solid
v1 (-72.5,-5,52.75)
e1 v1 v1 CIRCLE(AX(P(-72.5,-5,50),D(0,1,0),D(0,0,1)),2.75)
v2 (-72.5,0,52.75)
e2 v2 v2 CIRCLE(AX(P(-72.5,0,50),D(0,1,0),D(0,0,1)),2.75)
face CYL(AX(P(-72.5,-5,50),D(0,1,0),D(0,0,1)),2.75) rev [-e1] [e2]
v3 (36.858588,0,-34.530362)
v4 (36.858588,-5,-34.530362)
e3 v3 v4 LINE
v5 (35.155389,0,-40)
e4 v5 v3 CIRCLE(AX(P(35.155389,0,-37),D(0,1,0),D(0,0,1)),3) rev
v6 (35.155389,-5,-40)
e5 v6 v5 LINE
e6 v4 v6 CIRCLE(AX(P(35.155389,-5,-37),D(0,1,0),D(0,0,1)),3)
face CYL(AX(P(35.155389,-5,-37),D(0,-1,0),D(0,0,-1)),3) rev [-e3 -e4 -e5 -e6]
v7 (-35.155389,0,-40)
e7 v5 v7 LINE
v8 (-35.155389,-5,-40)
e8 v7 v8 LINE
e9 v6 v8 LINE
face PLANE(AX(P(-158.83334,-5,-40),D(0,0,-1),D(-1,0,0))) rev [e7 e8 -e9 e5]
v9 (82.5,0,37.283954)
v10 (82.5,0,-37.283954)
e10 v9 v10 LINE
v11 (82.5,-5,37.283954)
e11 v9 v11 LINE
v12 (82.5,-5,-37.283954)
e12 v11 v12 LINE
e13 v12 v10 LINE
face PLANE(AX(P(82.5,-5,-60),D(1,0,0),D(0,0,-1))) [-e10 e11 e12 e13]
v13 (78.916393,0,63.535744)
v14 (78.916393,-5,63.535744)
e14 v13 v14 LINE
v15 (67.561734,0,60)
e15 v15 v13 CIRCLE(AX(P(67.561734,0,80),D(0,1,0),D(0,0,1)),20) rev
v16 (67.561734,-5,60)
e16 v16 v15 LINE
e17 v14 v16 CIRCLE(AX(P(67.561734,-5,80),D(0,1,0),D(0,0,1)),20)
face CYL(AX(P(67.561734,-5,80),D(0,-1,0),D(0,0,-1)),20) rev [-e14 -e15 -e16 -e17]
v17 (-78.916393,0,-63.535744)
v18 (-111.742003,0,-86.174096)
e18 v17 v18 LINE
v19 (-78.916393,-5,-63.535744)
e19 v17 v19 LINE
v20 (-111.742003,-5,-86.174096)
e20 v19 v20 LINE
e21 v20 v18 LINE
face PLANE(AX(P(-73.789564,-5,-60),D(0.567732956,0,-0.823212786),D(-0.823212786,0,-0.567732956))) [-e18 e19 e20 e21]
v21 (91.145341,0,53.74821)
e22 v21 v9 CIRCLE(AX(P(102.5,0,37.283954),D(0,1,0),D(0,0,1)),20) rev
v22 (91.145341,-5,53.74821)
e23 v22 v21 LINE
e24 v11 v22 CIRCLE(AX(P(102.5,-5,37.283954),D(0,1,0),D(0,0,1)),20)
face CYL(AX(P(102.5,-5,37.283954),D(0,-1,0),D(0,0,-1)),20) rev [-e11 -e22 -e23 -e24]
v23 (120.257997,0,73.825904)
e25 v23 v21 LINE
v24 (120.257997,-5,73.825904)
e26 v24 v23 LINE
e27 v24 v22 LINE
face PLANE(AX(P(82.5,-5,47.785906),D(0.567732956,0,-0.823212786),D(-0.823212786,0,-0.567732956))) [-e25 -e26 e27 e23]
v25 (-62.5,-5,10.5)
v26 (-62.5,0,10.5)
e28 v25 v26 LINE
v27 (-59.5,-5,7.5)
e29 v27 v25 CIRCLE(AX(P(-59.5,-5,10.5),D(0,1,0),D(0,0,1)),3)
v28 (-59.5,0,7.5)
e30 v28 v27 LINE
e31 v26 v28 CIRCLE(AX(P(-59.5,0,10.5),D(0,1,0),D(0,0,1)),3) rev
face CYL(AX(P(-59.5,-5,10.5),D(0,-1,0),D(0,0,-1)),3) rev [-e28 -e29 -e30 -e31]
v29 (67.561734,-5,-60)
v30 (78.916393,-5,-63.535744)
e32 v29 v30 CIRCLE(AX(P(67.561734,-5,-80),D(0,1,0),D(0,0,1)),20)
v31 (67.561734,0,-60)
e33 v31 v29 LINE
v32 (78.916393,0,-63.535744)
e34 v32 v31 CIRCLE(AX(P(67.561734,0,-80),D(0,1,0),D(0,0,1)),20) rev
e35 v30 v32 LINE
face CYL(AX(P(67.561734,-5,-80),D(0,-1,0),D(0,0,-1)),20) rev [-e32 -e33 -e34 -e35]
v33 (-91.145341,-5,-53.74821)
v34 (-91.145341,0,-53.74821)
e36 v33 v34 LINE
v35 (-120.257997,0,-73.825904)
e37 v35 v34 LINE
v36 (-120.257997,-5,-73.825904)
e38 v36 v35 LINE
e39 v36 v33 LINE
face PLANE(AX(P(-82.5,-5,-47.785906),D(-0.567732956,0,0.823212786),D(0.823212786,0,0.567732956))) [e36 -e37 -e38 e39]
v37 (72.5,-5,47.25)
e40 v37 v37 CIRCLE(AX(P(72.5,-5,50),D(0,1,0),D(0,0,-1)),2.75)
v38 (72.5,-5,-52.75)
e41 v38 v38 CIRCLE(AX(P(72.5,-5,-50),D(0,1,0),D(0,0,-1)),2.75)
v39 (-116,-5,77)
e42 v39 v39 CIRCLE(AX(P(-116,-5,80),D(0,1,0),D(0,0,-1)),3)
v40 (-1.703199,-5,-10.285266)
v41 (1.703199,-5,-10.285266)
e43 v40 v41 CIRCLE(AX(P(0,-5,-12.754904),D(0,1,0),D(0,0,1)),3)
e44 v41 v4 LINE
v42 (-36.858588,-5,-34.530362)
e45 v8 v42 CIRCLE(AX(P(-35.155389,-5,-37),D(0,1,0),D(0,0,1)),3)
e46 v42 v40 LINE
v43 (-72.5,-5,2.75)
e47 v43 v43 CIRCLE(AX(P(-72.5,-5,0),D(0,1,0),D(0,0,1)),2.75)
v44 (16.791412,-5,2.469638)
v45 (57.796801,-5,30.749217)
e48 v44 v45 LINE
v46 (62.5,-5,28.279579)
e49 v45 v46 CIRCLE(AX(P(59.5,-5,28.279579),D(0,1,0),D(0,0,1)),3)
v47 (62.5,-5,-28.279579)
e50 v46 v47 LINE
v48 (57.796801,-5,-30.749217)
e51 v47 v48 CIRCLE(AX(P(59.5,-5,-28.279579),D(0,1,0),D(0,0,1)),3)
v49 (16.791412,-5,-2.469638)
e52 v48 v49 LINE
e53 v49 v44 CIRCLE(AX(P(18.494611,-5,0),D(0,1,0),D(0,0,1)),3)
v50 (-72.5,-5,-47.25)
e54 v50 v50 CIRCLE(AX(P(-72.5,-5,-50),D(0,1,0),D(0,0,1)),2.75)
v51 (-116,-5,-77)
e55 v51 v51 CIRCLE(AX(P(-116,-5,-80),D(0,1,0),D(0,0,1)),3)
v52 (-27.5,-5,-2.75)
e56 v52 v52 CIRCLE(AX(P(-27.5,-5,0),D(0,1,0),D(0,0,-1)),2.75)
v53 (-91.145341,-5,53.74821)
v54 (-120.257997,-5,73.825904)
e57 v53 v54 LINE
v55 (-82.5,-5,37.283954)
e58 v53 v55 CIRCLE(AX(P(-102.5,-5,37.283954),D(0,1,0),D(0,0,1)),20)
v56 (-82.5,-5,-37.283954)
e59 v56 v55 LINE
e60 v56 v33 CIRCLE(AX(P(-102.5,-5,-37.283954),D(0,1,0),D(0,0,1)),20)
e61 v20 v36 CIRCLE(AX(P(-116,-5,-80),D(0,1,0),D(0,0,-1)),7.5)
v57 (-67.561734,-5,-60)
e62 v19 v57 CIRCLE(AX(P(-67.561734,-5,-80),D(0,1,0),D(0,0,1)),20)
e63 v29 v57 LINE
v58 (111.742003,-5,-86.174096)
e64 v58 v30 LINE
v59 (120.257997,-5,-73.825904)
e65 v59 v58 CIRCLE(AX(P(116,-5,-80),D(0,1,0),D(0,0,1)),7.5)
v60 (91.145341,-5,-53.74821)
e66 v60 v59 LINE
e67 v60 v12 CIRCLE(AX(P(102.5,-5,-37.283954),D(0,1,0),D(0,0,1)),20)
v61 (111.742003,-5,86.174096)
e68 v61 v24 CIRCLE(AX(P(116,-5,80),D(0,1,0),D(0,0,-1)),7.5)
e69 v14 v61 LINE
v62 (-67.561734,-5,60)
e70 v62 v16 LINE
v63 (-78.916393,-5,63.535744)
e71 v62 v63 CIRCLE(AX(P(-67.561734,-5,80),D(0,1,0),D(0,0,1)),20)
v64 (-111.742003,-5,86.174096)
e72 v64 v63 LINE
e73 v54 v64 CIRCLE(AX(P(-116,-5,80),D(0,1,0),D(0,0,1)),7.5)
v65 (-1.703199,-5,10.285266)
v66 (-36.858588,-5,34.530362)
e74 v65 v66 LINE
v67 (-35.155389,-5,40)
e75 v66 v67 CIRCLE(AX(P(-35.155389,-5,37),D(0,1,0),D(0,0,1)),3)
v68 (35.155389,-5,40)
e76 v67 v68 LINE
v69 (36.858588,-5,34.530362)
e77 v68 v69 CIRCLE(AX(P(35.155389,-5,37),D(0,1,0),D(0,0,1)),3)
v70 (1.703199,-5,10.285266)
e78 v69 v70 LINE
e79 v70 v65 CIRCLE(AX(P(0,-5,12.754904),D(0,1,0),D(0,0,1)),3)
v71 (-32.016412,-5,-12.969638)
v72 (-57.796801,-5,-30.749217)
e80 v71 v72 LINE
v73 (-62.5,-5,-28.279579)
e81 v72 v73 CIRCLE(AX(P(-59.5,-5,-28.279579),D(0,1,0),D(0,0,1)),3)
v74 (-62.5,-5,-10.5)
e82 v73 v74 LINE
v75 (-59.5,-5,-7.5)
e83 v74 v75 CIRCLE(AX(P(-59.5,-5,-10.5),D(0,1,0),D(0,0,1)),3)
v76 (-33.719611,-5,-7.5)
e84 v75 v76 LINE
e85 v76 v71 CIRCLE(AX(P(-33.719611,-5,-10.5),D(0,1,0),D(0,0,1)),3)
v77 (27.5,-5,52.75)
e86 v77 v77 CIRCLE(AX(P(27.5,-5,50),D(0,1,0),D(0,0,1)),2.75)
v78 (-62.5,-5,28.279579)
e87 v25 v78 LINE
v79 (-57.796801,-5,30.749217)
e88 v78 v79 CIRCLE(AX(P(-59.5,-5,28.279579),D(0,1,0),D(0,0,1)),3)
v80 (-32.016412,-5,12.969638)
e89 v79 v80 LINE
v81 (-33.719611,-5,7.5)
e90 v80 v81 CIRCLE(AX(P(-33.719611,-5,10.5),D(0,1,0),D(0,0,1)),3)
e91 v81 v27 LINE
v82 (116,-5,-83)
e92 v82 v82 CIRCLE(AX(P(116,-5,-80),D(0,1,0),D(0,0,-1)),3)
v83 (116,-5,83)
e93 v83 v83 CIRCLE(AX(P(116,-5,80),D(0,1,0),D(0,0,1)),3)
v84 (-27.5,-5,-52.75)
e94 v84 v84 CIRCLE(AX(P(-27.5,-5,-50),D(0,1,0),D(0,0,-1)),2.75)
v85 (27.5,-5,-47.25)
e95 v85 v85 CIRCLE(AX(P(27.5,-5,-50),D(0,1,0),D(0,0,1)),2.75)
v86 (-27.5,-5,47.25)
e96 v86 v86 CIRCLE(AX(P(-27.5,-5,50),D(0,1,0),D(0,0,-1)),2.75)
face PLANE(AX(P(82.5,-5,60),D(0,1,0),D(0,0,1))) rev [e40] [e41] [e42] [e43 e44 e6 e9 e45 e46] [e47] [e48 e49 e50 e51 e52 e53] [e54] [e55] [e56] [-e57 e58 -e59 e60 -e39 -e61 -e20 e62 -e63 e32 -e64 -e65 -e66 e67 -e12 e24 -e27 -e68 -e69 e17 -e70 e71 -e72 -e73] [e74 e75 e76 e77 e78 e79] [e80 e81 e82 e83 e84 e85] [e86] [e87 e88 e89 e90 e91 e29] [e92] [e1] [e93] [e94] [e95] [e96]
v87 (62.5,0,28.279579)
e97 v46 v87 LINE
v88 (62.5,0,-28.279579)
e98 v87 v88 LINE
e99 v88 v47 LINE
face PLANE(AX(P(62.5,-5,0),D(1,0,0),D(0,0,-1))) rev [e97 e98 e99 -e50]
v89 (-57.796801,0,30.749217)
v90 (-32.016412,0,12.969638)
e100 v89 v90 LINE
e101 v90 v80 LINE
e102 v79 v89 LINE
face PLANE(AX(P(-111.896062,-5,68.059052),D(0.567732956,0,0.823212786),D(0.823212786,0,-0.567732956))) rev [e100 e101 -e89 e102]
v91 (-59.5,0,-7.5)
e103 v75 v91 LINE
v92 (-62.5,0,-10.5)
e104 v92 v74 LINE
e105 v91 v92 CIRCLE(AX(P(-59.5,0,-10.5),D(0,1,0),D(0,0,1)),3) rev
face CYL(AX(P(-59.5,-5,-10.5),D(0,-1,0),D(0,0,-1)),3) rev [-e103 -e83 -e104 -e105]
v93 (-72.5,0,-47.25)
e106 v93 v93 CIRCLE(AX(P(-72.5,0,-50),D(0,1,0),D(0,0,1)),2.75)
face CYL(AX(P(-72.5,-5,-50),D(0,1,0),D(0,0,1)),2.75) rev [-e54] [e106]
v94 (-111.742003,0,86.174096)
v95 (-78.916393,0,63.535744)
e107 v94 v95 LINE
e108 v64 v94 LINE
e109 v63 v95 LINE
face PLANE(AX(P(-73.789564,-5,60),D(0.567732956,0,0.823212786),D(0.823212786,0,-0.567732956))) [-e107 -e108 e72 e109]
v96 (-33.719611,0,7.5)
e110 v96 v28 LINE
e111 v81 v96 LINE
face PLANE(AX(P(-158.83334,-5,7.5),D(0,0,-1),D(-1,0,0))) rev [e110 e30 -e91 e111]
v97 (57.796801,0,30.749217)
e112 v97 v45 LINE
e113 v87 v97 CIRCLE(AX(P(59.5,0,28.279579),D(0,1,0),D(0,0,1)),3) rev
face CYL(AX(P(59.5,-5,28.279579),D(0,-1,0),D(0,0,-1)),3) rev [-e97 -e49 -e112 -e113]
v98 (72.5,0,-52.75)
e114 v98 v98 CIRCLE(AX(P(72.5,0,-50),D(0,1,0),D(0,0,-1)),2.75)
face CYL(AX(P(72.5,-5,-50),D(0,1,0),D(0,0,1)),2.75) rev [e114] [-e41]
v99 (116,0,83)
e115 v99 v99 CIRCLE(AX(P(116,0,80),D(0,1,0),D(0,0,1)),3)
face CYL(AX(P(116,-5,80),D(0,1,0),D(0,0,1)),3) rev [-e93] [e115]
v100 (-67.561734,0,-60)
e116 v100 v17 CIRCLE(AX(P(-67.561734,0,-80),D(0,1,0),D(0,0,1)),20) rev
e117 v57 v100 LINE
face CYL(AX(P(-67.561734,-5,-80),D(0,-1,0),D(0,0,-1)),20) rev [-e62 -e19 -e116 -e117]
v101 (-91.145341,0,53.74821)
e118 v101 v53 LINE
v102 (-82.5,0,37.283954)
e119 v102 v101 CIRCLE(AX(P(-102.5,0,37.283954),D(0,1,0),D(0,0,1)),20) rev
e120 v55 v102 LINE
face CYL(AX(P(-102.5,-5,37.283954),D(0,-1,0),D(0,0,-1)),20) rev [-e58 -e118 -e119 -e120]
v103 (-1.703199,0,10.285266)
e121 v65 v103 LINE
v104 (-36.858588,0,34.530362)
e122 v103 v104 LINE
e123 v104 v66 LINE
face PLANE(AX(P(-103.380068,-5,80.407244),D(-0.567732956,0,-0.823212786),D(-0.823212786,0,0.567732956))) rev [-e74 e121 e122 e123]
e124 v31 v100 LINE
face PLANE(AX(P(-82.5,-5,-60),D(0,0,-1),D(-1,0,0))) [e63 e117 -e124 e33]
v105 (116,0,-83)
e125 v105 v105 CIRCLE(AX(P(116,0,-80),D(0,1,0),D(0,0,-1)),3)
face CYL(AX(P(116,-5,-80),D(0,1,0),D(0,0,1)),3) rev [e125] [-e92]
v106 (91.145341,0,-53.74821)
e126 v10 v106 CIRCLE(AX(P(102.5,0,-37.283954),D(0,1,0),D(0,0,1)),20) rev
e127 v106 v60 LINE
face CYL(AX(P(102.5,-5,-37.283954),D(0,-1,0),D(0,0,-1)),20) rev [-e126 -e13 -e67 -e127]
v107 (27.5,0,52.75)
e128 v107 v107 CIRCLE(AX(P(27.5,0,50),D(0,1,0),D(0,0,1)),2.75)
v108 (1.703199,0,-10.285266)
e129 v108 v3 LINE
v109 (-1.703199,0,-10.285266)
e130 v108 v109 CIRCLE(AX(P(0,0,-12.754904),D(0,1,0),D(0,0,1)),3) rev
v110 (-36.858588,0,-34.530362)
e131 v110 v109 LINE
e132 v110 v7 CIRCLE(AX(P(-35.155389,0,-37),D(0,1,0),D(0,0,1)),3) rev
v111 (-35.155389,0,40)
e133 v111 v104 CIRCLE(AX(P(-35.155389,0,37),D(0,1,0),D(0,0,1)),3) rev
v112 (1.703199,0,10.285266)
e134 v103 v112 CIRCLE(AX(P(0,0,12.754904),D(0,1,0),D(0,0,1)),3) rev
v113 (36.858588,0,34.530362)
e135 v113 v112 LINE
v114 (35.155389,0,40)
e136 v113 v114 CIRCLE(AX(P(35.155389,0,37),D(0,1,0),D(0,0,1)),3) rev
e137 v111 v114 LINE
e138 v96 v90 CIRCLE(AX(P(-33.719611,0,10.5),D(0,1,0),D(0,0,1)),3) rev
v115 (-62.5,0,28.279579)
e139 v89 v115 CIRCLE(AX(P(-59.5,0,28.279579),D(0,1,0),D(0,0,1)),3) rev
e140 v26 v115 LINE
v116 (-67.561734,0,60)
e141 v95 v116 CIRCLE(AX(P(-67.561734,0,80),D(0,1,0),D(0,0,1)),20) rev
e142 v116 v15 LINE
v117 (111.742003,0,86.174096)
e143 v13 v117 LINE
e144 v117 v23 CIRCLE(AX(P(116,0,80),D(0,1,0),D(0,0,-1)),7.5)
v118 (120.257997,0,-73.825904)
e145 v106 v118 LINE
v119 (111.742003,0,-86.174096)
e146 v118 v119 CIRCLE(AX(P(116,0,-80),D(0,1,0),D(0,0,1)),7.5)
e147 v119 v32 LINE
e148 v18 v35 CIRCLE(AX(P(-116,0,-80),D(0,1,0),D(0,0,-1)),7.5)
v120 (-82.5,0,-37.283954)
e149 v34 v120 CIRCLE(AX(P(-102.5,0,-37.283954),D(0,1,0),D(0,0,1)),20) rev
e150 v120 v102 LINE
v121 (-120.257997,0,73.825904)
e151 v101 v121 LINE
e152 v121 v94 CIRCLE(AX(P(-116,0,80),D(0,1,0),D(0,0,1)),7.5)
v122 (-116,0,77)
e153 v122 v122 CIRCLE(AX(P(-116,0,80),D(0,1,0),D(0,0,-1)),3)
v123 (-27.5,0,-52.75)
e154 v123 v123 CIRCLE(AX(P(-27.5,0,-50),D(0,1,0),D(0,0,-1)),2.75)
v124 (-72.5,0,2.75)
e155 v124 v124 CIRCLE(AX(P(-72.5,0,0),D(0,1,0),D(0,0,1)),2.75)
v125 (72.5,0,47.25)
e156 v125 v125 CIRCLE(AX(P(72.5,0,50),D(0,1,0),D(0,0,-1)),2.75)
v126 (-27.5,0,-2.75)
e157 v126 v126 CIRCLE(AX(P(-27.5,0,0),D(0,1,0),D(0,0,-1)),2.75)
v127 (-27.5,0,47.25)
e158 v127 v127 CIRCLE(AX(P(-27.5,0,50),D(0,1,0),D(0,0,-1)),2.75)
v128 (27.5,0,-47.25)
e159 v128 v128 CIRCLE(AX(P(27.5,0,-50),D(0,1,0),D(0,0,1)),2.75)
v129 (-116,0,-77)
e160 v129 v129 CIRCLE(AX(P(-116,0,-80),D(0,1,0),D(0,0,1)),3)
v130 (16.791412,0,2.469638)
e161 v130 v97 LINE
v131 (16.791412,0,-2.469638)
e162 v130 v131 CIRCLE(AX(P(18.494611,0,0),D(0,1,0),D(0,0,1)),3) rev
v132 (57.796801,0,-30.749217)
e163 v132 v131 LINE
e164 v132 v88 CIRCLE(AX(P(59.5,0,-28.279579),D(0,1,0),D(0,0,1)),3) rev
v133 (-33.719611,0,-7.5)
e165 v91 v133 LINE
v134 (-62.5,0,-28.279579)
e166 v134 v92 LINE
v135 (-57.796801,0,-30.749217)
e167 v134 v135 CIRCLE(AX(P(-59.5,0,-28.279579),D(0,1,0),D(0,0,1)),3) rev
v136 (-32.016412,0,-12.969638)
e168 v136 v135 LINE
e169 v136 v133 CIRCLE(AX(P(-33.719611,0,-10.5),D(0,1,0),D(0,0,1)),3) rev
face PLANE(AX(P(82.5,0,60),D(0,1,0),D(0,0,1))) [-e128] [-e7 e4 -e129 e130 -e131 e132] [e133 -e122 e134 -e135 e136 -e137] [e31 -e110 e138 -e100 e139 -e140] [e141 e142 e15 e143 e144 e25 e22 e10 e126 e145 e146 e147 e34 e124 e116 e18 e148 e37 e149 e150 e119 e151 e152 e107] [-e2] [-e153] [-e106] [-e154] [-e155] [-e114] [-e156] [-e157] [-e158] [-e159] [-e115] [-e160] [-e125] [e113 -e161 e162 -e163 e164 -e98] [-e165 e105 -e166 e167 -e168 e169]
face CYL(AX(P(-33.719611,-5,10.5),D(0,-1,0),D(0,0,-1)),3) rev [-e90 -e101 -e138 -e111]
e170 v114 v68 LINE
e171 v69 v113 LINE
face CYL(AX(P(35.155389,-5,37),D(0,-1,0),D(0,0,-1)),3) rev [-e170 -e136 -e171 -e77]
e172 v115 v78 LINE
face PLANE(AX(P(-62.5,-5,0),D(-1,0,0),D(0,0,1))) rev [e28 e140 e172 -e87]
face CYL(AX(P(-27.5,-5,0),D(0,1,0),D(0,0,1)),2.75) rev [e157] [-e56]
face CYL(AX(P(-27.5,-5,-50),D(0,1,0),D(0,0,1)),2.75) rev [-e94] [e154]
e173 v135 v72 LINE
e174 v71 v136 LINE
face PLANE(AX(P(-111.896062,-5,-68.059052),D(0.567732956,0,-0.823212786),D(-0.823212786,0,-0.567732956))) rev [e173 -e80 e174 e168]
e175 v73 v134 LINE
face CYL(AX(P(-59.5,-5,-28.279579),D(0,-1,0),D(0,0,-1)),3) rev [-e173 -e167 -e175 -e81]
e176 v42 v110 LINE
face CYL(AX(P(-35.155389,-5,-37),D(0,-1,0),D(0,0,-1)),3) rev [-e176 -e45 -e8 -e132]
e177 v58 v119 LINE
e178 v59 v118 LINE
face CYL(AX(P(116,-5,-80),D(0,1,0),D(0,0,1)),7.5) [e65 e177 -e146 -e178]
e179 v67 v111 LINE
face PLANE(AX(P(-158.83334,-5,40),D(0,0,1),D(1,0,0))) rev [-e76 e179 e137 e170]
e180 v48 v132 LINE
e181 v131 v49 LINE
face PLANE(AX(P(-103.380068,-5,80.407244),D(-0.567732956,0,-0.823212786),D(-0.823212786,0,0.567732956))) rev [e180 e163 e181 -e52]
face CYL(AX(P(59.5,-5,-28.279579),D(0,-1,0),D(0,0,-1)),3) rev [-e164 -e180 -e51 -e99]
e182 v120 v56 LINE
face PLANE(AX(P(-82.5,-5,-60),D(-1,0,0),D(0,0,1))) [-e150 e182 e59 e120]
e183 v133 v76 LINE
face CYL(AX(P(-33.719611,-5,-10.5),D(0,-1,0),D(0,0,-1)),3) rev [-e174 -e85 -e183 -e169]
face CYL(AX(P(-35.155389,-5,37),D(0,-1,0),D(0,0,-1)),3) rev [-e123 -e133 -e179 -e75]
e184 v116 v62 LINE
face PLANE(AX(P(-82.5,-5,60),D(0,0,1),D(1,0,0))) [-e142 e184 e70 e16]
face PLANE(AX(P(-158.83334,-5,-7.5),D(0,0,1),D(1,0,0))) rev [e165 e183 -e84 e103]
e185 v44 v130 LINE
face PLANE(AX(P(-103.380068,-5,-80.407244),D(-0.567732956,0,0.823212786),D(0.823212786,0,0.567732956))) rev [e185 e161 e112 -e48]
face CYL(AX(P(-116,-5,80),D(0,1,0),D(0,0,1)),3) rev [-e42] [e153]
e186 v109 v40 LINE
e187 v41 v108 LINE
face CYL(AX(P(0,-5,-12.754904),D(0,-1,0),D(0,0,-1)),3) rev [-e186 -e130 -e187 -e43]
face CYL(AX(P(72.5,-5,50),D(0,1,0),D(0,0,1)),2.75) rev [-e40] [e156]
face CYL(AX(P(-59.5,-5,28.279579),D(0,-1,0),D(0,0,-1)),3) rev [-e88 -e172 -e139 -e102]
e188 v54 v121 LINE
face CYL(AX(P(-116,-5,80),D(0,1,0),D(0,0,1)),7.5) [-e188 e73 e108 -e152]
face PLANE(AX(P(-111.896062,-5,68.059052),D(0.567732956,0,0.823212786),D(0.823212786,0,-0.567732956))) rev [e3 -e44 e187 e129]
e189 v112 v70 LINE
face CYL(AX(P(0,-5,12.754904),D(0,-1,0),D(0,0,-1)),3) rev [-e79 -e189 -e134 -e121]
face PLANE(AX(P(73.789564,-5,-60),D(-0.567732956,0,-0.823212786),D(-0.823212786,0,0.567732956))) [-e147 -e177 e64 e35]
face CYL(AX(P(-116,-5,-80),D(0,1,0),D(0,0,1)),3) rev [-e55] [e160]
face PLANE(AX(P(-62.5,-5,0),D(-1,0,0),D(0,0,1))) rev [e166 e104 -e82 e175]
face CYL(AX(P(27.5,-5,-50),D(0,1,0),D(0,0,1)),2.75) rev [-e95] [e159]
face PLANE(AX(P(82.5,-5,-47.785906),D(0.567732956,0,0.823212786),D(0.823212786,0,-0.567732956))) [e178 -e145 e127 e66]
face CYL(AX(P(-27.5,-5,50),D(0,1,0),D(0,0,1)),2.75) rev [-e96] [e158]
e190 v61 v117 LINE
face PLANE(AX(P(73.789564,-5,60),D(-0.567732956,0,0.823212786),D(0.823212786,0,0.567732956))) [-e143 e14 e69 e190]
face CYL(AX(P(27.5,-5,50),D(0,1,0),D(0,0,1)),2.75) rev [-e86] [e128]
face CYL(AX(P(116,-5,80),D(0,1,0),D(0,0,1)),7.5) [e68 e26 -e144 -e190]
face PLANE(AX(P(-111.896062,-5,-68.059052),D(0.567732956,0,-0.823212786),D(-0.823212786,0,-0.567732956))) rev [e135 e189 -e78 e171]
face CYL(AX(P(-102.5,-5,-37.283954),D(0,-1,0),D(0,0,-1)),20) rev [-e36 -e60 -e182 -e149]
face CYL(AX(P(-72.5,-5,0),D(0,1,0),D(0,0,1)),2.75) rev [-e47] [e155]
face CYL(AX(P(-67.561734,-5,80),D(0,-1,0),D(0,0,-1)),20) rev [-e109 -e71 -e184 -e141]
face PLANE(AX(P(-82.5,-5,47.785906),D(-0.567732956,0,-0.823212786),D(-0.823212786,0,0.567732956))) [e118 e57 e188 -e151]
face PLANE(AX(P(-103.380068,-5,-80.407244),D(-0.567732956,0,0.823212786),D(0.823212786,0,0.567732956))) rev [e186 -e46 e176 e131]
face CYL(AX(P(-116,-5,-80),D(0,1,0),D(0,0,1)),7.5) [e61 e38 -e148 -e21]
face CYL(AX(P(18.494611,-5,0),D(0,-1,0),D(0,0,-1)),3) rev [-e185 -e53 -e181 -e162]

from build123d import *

# Parameters (mm, degrees)
BASE_FLANGE1_START     = -5
BASE_FLANGE1_OUTLINE_W = 165
BASE_FLANGE1_OUTLINE_H = 120
BASE_FLANGE1_DEPTH     = 5
SKETCH2_R              = 2.75
CUT_EXTRUDE1_DEPTH     = 5
CUT_EXTRUDE2_DEPTH     = 5
FILLET2_R              = 3
SKETCH4_R              = 3
TAB1_DEPTH             = 5
FILLET3_R              = 20


# Read off the part's stored shape, not the designer's step: Base-Flange1
# Sheet-metal steps are written as plain solids
with BuildPart() as part:
    # Base-Flange1 outline → Base-Flange1 (new body)
    with BuildSketch(Plane(origin=(0, 0, 0), x_dir=(1, 0, 0), z_dir=(0, 1, 0)).offset(BASE_FLANGE1_START)):
        Rectangle(BASE_FLANGE1_OUTLINE_W, BASE_FLANGE1_OUTLINE_H)
    extrude(amount=BASE_FLANGE1_DEPTH)

    # Sketch2 → Cut-Extrude1 (cut)
    with BuildSketch(Plane(origin=(0, 0, 0), x_dir=(1, 0, 0), z_dir=(0, 1, 0))):
        with Locations(Location((-72.5, 50, 0), (0, 0, 270))):
            Circle(SKETCH2_R)
        with Locations(Location((-72.5, 0, 0), (0, 0, 270))):
            Circle(SKETCH2_R)
        with Locations(Location((-72.5, -50, 0), (0, 0, 270))):
            Circle(SKETCH2_R)
        with Locations(Location((-27.5, -50, 0), (0, 0, 90))):
            Circle(SKETCH2_R)
        with Locations(Location((-27.5, 0, 0), (0, 0, 90))):
            Circle(SKETCH2_R)
        with Locations(Location((-27.5, 50, 0), (0, 0, 90))):
            Circle(SKETCH2_R)
        with Locations(Location((27.5, -50, 0), (0, 0, 270))):
            Circle(SKETCH2_R)
        with Locations(Location((72.5, -50, 0), (0, 0, 90))):
            Circle(SKETCH2_R)
        with Locations(Location((27.5, 50, 0), (0, 0, 270))):
            Circle(SKETCH2_R)
        with Locations(Location((72.5, 50, 0), (0, 0, 90))):
            Circle(SKETCH2_R)
    extrude(amount=-CUT_EXTRUDE1_DEPTH, mode=Mode.SUBTRACT)

    # Sketch3 → Cut-Extrude2 (cut)
    with BuildSketch(Plane(origin=(0, 0, 0), x_dir=(1, 0, 0), z_dir=(0, 1, 0))):
        Polygon((-62.5, -7.5), (-62.5, -33.99280261), (-24.085436215, -7.5), align=None)
        Polygon((-62.5, 7.5), (-24.085436215, 7.5), (-62.5, 33.99280261), align=None)
        Polygon((-44.789563785, 40), (0, 9.110645666), (44.789563785, 40), align=None)
        Polygon((62.5, 33.99280261), (13.210436215, 0), (62.5, -33.99280261), align=None)
        Polygon((-44.789563785, -40), (44.789563785, -40), (0, -9.110645666), align=None)
    extrude(amount=-CUT_EXTRUDE2_DEPTH, mode=Mode.SUBTRACT)

    # Fillet2
    fillet2_edges = [part.edges().sort_by_distance(p)[0] for p in [
        (13.210436215, -2.5, 0),
        (62.5, -2.5, -33.99280261),
        (62.5, -2.5, 33.99280261),
        (44.789563785, -2.5, 40),
        (-44.789563785, -2.5, 40),
        (0, -2.5, 9.110645666),
        (-62.5, -2.5, 33.99280261),
        (-62.5, -2.5, 7.5),
        (-24.085436215, -2.5, 7.5),
        (-24.085436215, -2.5, -7.5),
        (-62.5, -2.5, -7.5),
        (-62.5, -2.5, -33.99280261),
        (0, -2.5, -9.110645666),
        (-44.789563785, -2.5, -40),
        (44.789563785, -2.5, -40),
    ]]
    fillet(fillet2_edges, radius=FILLET2_R)

    # Sketch4 → Tab1 (add)
    # profile 1 of 4: a face of its own
    with BuildSketch(Plane(origin=(0, 0, 0), x_dir=(1, 0, 0), z_dir=(0, 1, 0))):
        with BuildLine():
            Line((-73.789563785, 60), (-111.742002831, 86.174095894))
            ThreePointArc((-111.742002831, 86.174095894), (-122.174095894, 84.257997169), (-120.257997169, 73.825904106))
            Line((-120.257997169, 73.825904106), (-82.5, 47.785906058))
            Line((-82.5, 47.785906058), (-73.789563785, 60))
        make_face()
        with Locations(Location((-116, 80, 0), (0, 0, 270))):
            Circle(SKETCH4_R, mode=Mode.SUBTRACT)
    # profile 2 of 4: a face of its own
    with BuildSketch(Plane(origin=(0, 0, 0), x_dir=(1, 0, 0), z_dir=(0, 1, 0))):
        with BuildLine():
            Line((73.789563785, 60), (82.5, 47.785906058))
            Line((82.5, 47.785906058), (120.257997169, 73.825904106))
            ThreePointArc((120.257997169, 73.825904106), (122.174095894, 84.257997169), (111.742002831, 86.174095894))
            Line((111.742002831, 86.174095894), (73.789563785, 60))
        make_face()
        with Locations(Location((116, 80, 0), (0, 0, 90))):
            Circle(SKETCH4_R, mode=Mode.SUBTRACT)
    # profile 3 of 4: a face of its own
    with BuildSketch(Plane(origin=(0, 0, 0), x_dir=(1, 0, 0), z_dir=(0, 1, 0))):
        with BuildLine():
            Line((73.789563785, -60), (111.742002831, -86.174095894))
            ThreePointArc((111.742002831, -86.174095894), (122.174095894, -84.257997169), (120.257997169, -73.825904106))
            Line((120.257997169, -73.825904106), (82.5, -47.785906058))
            Line((82.5, -47.785906058), (73.789563785, -60))
        make_face()
        with Locations(Location((116, -80, 0), (0, 0, 270))):
            Circle(SKETCH4_R, mode=Mode.SUBTRACT)
    # profile 4 of 4: a face of its own
    with BuildSketch(Plane(origin=(0, 0, 0), x_dir=(1, 0, 0), z_dir=(0, 1, 0))):
        with BuildLine():
            Line((-73.789563785, -60), (-82.5, -47.785906058))
            Line((-82.5, -47.785906058), (-120.257997169, -73.825904106))
            ThreePointArc((-120.257997169, -73.825904106), (-122.174095894, -84.257997169), (-111.742002831, -86.174095894))
            Line((-111.742002831, -86.174095894), (-73.789563785, -60))
        make_face()
        with Locations(Location((-116, -80, 0), (0, 0, 90))):
            Circle(SKETCH4_R, mode=Mode.SUBTRACT)
    extrude(amount=-TAB1_DEPTH)

    # Fillet3
    fillet3_edges = [part.edges().sort_by_distance(p)[0] for p in [
        (-73.789563785, -2.5, -60),
        (-82.5, -2.5, -47.785906058),
        (82.5, -2.5, -47.785906058),
        (73.789563785, -2.5, -60),
        (73.789563785, -2.5, 60),
        (82.5, -2.5, 47.785906058),
        (-82.5, -2.5, 47.785906058),
        (-73.789563785, -2.5, 60),
    ]]
    fillet(fillet3_edges, radius=FILLET3_R)


solid = part.part
